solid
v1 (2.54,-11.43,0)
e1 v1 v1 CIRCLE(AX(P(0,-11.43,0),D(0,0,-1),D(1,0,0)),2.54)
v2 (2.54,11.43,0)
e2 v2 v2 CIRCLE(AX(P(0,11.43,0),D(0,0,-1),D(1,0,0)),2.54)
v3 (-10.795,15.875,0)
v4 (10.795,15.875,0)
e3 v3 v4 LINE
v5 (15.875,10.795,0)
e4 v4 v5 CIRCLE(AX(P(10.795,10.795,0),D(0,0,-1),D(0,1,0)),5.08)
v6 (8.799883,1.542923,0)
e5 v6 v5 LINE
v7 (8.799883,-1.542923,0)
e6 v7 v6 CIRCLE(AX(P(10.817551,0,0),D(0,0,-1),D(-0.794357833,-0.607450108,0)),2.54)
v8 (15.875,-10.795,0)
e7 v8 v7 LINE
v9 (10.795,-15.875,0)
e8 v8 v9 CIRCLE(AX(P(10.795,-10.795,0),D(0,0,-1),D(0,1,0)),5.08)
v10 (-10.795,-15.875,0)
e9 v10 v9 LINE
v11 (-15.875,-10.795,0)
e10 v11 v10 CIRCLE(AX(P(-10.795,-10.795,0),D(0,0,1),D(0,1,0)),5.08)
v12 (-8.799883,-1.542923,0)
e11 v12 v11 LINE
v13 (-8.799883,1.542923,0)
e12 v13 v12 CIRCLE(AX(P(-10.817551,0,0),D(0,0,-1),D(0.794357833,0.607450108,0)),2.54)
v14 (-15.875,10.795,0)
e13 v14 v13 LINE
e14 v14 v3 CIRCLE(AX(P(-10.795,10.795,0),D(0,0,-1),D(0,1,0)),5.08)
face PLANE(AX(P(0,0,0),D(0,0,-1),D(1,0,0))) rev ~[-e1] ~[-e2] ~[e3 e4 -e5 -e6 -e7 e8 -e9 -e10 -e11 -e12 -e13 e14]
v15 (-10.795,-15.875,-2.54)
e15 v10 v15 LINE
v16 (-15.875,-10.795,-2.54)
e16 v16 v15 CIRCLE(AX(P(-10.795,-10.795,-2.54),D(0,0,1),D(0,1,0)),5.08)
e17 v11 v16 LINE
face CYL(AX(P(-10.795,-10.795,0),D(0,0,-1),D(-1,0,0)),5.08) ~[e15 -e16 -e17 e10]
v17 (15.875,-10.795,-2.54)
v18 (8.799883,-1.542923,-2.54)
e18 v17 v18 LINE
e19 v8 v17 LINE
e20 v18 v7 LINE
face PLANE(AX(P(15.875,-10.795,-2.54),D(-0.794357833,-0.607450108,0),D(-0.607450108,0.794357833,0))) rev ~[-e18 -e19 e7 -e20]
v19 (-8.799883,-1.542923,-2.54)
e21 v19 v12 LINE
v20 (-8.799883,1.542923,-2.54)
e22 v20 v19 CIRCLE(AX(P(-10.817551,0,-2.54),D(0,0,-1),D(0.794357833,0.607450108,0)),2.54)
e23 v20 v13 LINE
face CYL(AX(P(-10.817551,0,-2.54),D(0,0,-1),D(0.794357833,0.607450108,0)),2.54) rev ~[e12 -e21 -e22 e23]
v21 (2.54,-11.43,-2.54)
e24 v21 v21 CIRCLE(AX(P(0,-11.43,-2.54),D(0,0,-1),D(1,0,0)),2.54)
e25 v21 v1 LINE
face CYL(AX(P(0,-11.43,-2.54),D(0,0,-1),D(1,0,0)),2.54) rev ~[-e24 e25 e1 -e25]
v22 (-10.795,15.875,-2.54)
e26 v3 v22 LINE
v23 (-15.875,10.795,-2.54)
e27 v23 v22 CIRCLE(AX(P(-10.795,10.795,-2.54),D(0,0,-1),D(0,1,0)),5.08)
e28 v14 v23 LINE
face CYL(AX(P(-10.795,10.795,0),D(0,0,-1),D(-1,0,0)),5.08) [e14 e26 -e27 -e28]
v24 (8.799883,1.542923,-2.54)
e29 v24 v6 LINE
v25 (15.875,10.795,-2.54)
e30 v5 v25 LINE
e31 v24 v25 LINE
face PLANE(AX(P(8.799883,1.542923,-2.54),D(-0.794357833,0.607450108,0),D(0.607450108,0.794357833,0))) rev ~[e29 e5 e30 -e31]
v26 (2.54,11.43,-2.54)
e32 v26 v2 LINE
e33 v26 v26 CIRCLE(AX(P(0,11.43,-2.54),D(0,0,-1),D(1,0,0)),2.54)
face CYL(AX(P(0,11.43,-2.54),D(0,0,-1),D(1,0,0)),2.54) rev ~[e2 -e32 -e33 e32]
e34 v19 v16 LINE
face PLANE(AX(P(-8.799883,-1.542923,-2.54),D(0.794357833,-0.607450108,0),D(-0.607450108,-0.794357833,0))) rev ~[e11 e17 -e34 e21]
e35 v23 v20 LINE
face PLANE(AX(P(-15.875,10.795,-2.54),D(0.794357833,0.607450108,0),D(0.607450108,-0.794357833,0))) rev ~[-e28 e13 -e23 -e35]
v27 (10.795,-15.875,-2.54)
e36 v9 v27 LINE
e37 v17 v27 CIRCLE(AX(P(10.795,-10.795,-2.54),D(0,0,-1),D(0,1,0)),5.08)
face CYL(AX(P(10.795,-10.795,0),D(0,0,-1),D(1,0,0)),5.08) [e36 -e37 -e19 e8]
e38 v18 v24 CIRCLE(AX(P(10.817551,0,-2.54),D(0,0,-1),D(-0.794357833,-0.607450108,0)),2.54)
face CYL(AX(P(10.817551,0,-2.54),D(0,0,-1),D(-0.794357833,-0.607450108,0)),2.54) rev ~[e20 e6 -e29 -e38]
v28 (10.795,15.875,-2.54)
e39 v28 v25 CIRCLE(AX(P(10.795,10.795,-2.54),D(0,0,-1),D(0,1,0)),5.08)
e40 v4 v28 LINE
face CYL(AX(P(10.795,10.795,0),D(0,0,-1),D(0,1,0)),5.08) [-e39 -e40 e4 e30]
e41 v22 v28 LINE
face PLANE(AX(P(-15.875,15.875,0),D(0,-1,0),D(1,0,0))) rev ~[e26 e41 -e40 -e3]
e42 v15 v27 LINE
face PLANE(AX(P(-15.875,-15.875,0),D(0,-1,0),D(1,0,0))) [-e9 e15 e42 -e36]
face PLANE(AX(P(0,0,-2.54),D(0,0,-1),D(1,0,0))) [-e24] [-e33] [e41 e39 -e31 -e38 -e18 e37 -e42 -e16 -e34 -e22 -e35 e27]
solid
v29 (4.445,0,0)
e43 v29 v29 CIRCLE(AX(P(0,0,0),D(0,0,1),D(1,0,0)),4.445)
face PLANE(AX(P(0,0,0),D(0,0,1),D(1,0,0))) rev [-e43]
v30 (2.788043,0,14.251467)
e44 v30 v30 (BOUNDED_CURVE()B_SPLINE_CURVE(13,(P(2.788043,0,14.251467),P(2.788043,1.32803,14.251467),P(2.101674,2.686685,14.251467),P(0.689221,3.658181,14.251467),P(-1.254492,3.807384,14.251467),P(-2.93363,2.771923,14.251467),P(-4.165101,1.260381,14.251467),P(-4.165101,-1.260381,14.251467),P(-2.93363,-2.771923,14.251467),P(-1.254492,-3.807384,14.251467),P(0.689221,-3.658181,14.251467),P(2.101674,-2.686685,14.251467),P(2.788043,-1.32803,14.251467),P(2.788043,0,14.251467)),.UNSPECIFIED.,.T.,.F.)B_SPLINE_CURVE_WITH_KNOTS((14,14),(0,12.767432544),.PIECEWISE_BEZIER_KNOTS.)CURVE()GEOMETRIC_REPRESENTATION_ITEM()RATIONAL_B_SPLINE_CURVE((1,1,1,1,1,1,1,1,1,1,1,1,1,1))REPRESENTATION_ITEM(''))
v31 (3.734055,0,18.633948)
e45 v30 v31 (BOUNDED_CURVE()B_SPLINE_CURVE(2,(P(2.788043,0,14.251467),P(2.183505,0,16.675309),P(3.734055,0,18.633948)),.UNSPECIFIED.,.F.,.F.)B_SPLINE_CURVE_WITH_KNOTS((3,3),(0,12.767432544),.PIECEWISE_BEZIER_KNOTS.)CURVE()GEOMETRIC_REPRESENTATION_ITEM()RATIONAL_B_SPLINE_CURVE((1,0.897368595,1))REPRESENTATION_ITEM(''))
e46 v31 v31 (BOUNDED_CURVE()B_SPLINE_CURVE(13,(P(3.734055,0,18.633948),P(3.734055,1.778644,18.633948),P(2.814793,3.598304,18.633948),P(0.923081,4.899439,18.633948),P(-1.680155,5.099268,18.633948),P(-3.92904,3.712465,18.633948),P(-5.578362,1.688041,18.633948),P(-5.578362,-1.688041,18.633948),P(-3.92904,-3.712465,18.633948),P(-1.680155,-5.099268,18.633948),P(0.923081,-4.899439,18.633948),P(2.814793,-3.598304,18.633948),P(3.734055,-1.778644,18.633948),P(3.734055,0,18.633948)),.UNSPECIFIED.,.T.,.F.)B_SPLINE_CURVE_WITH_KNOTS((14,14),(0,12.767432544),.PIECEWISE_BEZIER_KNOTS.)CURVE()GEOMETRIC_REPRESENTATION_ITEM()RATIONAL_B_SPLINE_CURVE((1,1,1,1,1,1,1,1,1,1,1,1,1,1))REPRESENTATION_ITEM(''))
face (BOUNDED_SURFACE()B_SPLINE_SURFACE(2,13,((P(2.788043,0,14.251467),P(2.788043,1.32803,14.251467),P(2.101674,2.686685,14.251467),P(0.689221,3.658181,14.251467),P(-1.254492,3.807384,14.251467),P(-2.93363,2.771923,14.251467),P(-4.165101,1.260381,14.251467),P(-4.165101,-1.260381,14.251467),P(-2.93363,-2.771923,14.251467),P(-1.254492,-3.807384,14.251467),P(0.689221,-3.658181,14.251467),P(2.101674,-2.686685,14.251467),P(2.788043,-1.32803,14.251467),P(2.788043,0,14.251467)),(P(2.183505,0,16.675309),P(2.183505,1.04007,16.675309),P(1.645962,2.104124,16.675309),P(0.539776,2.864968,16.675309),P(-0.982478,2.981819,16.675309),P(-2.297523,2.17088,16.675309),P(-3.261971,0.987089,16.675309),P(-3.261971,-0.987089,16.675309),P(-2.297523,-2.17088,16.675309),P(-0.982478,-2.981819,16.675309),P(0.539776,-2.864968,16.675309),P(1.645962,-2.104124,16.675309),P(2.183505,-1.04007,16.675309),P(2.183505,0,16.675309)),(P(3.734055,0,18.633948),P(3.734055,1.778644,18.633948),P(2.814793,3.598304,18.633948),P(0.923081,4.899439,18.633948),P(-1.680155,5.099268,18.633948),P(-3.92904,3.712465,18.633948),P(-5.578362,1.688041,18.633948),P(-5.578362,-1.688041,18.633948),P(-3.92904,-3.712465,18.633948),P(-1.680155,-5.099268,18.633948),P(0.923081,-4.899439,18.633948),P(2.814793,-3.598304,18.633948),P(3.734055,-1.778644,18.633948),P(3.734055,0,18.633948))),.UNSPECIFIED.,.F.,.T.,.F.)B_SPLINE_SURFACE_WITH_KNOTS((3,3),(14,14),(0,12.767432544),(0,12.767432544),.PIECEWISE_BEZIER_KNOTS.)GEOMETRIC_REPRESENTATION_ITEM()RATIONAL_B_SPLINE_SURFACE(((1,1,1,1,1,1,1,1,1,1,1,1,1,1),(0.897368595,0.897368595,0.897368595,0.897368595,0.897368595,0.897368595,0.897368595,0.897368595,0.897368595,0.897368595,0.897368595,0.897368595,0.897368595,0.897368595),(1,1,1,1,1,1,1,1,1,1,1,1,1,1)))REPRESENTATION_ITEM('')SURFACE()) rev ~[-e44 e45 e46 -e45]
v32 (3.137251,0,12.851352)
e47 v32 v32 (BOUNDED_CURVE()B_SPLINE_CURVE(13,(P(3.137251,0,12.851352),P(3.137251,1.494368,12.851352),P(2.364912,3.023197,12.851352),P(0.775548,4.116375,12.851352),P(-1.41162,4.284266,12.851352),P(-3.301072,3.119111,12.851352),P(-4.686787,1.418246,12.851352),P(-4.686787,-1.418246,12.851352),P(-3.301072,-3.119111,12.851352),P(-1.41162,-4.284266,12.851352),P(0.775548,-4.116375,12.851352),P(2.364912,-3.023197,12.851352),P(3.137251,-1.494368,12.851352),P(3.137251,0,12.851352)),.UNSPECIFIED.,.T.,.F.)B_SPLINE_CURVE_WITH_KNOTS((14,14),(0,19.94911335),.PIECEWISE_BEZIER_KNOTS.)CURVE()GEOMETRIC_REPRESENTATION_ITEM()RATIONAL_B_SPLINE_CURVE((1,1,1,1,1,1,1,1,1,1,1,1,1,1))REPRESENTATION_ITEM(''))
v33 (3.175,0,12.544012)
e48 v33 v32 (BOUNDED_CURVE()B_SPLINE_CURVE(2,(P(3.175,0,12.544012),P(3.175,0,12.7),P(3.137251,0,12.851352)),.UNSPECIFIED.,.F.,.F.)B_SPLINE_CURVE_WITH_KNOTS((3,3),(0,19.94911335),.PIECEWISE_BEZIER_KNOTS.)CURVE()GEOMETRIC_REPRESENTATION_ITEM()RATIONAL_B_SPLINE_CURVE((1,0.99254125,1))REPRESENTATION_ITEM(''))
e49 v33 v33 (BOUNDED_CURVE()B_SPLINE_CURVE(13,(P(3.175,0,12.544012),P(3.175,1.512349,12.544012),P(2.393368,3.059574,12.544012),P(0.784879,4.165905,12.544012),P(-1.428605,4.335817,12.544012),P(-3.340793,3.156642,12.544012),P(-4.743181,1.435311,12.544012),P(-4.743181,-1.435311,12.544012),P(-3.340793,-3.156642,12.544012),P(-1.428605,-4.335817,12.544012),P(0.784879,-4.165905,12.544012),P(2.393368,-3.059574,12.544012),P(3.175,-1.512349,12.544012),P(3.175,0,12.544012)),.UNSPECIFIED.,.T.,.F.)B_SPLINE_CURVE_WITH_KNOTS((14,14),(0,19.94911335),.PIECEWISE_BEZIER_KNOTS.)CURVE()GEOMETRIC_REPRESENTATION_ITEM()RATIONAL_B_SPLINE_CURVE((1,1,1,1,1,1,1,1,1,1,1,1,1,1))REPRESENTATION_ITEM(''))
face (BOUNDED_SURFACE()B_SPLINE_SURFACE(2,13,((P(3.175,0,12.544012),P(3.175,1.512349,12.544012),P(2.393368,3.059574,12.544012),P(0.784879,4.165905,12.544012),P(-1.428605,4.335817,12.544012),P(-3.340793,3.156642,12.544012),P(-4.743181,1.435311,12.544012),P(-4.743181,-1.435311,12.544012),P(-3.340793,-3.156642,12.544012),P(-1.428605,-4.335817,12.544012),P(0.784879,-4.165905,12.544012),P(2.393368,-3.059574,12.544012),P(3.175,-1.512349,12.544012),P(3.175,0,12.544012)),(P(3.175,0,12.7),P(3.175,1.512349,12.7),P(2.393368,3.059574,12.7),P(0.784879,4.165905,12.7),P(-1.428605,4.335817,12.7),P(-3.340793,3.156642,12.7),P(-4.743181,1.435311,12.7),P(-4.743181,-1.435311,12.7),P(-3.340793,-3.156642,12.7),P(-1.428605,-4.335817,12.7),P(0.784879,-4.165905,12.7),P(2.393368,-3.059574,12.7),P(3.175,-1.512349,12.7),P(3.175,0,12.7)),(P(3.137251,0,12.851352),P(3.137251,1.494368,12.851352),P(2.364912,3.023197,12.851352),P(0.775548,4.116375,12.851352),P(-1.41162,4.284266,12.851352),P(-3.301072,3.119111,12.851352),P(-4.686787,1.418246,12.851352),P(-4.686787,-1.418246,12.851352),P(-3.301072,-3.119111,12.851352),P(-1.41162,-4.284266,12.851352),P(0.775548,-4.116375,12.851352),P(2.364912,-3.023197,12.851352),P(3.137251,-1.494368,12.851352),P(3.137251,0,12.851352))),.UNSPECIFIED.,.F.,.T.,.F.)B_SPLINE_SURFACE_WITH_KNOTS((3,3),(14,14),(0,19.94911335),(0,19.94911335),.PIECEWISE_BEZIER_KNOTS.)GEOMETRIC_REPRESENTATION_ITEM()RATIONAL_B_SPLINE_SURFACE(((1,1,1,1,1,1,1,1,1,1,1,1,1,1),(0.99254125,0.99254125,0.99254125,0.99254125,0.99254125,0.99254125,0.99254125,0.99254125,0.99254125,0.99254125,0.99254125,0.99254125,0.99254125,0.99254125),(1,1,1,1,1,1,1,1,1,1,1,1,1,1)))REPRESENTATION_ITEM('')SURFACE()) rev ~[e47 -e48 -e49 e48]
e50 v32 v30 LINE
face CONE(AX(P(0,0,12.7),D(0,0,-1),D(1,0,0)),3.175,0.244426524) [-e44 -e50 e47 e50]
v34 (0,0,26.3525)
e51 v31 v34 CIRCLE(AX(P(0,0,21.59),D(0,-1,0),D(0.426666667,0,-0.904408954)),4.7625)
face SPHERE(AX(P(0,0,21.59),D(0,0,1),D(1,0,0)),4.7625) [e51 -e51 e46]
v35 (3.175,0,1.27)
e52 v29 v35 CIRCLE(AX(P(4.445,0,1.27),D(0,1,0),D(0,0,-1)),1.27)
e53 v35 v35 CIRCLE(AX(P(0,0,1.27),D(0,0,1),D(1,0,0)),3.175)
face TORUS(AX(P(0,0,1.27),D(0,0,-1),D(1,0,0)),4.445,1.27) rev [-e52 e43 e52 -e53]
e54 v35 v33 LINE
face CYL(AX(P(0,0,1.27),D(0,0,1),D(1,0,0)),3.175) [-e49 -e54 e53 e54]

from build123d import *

# Parameters (mm, degrees)
F2_W     = 31.75
F2_H     = 31.75
F2_R     = 4.445
F3_DEPTH = 2.54
F4_R     = 5.08
F5_R     = 2.54
F6_DEPTH = 28.8935
F7_R     = 1.27
F9_DEPTH = 28.8935
F10_R    = 5.08


with BuildPart() as f1:
    # F0 (on Front) → F1 (revolve)
    with BuildSketch(Plane.XZ):
        with BuildLine():
            Line((0, 12.7), (0, 0))
            Line((0, 0), (3.175, 0))
            Line((3.175, 0), (4.445, 0))
            ThreePointArc((4.445, 0), (3.5469743879, 0.3719743879), (3.175, 1.27))
            Line((3.175, 1.27), (3.175, 12.7))
            Line((3.175, 12.7), (2.032, 17.2827523579))
            ThreePointArc((2.032, 17.2827523579), (4.6472934675, 22.6311866679), (0, 26.3525))
            Line((0, 26.3525), (0, 16.8275))
            Line((0, 16.8275), (0, 12.7))
        make_face()
    revolve(axis=Axis((0, 0, 21.59), (0, 0, 1)))

    # F7
    f7_edges = [f1.edges().sort_by_distance(p)[0] for p in [
        (-3.175, 0, 12.7),
    ]]
    fillet(f7_edges, radius=F7_R)

    # F10
    f10_edges = [f1.edges().sort_by_distance(p)[0] for p in [
        (-2.032, 0, 17.282752),
    ]]
    fillet(f10_edges, radius=F10_R)


with BuildPart() as f3:
    # F2 (on face) → F3 (new body)
    with BuildSketch(Plane(origin=(0, 0, 0), x_dir=(1, 0, 0), z_dir=(0, 0, -1))):
        Rectangle(F2_W, F2_H)
        Circle(F2_R, mode=Mode.SUBTRACT)
        Circle(F2_R)
    extrude(amount=F3_DEPTH)

    # F4
    f4_edges = [f3.edges().sort_by_distance(p)[0] for p in [
        (-15.875, -15.875, -1.27),
        (15.875, -15.875, -1.27),
        (15.875, 15.875, -1.27),
        (-15.875, 15.875, -1.27),
    ]]
    fillet(f4_edges, radius=F4_R)

    # F5 (on face) → F6 (cut, through all)
    with BuildSketch(Plane(origin=(0, 0, -2.54), x_dir=(1, 0, 0), z_dir=(0, 0, -1))):
        with Locations((0, 11.43)):
            Circle(F5_R)
        with Locations((0, -11.43)):
            Circle(F5_R)
    extrude(amount=-F6_DEPTH, mode=Mode.SUBTRACT)

    # F8 (on face) → F9 (cut, through all)
    with BuildSketch(Plane(origin=(0, 0, -2.54), x_dir=(1, 0, 0), z_dir=(0, 0, -1))):
        with BuildLine():
            Line((-8.7998825031, 1.5429232732), (-15.875, 10.795))
            Line((-15.875, 10.795), (-15.875, -10.795))
            Line((-15.875, -10.795), (-8.7998825031, -1.5429232732))
            ThreePointArc((-8.7998825031, -1.5429232732), (-8.2775513988, 0), (-8.7998825031, 1.5429232732))
        make_face()
        with BuildLine():
            Line((15.875, -10.795), (15.875, 10.795))
            Line((15.875, 10.795), (8.7998825031, 1.5429232732))
            ThreePointArc((8.7998825031, 1.5429232732), (8.2775513988, 0), (8.7998825031, -1.5429232732))
            Line((8.7998825031, -1.5429232732), (15.875, -10.795))
        make_face()
    extrude(amount=-F9_DEPTH, mode=Mode.SUBTRACT)


solid = Compound([f1.part, f3.part])
